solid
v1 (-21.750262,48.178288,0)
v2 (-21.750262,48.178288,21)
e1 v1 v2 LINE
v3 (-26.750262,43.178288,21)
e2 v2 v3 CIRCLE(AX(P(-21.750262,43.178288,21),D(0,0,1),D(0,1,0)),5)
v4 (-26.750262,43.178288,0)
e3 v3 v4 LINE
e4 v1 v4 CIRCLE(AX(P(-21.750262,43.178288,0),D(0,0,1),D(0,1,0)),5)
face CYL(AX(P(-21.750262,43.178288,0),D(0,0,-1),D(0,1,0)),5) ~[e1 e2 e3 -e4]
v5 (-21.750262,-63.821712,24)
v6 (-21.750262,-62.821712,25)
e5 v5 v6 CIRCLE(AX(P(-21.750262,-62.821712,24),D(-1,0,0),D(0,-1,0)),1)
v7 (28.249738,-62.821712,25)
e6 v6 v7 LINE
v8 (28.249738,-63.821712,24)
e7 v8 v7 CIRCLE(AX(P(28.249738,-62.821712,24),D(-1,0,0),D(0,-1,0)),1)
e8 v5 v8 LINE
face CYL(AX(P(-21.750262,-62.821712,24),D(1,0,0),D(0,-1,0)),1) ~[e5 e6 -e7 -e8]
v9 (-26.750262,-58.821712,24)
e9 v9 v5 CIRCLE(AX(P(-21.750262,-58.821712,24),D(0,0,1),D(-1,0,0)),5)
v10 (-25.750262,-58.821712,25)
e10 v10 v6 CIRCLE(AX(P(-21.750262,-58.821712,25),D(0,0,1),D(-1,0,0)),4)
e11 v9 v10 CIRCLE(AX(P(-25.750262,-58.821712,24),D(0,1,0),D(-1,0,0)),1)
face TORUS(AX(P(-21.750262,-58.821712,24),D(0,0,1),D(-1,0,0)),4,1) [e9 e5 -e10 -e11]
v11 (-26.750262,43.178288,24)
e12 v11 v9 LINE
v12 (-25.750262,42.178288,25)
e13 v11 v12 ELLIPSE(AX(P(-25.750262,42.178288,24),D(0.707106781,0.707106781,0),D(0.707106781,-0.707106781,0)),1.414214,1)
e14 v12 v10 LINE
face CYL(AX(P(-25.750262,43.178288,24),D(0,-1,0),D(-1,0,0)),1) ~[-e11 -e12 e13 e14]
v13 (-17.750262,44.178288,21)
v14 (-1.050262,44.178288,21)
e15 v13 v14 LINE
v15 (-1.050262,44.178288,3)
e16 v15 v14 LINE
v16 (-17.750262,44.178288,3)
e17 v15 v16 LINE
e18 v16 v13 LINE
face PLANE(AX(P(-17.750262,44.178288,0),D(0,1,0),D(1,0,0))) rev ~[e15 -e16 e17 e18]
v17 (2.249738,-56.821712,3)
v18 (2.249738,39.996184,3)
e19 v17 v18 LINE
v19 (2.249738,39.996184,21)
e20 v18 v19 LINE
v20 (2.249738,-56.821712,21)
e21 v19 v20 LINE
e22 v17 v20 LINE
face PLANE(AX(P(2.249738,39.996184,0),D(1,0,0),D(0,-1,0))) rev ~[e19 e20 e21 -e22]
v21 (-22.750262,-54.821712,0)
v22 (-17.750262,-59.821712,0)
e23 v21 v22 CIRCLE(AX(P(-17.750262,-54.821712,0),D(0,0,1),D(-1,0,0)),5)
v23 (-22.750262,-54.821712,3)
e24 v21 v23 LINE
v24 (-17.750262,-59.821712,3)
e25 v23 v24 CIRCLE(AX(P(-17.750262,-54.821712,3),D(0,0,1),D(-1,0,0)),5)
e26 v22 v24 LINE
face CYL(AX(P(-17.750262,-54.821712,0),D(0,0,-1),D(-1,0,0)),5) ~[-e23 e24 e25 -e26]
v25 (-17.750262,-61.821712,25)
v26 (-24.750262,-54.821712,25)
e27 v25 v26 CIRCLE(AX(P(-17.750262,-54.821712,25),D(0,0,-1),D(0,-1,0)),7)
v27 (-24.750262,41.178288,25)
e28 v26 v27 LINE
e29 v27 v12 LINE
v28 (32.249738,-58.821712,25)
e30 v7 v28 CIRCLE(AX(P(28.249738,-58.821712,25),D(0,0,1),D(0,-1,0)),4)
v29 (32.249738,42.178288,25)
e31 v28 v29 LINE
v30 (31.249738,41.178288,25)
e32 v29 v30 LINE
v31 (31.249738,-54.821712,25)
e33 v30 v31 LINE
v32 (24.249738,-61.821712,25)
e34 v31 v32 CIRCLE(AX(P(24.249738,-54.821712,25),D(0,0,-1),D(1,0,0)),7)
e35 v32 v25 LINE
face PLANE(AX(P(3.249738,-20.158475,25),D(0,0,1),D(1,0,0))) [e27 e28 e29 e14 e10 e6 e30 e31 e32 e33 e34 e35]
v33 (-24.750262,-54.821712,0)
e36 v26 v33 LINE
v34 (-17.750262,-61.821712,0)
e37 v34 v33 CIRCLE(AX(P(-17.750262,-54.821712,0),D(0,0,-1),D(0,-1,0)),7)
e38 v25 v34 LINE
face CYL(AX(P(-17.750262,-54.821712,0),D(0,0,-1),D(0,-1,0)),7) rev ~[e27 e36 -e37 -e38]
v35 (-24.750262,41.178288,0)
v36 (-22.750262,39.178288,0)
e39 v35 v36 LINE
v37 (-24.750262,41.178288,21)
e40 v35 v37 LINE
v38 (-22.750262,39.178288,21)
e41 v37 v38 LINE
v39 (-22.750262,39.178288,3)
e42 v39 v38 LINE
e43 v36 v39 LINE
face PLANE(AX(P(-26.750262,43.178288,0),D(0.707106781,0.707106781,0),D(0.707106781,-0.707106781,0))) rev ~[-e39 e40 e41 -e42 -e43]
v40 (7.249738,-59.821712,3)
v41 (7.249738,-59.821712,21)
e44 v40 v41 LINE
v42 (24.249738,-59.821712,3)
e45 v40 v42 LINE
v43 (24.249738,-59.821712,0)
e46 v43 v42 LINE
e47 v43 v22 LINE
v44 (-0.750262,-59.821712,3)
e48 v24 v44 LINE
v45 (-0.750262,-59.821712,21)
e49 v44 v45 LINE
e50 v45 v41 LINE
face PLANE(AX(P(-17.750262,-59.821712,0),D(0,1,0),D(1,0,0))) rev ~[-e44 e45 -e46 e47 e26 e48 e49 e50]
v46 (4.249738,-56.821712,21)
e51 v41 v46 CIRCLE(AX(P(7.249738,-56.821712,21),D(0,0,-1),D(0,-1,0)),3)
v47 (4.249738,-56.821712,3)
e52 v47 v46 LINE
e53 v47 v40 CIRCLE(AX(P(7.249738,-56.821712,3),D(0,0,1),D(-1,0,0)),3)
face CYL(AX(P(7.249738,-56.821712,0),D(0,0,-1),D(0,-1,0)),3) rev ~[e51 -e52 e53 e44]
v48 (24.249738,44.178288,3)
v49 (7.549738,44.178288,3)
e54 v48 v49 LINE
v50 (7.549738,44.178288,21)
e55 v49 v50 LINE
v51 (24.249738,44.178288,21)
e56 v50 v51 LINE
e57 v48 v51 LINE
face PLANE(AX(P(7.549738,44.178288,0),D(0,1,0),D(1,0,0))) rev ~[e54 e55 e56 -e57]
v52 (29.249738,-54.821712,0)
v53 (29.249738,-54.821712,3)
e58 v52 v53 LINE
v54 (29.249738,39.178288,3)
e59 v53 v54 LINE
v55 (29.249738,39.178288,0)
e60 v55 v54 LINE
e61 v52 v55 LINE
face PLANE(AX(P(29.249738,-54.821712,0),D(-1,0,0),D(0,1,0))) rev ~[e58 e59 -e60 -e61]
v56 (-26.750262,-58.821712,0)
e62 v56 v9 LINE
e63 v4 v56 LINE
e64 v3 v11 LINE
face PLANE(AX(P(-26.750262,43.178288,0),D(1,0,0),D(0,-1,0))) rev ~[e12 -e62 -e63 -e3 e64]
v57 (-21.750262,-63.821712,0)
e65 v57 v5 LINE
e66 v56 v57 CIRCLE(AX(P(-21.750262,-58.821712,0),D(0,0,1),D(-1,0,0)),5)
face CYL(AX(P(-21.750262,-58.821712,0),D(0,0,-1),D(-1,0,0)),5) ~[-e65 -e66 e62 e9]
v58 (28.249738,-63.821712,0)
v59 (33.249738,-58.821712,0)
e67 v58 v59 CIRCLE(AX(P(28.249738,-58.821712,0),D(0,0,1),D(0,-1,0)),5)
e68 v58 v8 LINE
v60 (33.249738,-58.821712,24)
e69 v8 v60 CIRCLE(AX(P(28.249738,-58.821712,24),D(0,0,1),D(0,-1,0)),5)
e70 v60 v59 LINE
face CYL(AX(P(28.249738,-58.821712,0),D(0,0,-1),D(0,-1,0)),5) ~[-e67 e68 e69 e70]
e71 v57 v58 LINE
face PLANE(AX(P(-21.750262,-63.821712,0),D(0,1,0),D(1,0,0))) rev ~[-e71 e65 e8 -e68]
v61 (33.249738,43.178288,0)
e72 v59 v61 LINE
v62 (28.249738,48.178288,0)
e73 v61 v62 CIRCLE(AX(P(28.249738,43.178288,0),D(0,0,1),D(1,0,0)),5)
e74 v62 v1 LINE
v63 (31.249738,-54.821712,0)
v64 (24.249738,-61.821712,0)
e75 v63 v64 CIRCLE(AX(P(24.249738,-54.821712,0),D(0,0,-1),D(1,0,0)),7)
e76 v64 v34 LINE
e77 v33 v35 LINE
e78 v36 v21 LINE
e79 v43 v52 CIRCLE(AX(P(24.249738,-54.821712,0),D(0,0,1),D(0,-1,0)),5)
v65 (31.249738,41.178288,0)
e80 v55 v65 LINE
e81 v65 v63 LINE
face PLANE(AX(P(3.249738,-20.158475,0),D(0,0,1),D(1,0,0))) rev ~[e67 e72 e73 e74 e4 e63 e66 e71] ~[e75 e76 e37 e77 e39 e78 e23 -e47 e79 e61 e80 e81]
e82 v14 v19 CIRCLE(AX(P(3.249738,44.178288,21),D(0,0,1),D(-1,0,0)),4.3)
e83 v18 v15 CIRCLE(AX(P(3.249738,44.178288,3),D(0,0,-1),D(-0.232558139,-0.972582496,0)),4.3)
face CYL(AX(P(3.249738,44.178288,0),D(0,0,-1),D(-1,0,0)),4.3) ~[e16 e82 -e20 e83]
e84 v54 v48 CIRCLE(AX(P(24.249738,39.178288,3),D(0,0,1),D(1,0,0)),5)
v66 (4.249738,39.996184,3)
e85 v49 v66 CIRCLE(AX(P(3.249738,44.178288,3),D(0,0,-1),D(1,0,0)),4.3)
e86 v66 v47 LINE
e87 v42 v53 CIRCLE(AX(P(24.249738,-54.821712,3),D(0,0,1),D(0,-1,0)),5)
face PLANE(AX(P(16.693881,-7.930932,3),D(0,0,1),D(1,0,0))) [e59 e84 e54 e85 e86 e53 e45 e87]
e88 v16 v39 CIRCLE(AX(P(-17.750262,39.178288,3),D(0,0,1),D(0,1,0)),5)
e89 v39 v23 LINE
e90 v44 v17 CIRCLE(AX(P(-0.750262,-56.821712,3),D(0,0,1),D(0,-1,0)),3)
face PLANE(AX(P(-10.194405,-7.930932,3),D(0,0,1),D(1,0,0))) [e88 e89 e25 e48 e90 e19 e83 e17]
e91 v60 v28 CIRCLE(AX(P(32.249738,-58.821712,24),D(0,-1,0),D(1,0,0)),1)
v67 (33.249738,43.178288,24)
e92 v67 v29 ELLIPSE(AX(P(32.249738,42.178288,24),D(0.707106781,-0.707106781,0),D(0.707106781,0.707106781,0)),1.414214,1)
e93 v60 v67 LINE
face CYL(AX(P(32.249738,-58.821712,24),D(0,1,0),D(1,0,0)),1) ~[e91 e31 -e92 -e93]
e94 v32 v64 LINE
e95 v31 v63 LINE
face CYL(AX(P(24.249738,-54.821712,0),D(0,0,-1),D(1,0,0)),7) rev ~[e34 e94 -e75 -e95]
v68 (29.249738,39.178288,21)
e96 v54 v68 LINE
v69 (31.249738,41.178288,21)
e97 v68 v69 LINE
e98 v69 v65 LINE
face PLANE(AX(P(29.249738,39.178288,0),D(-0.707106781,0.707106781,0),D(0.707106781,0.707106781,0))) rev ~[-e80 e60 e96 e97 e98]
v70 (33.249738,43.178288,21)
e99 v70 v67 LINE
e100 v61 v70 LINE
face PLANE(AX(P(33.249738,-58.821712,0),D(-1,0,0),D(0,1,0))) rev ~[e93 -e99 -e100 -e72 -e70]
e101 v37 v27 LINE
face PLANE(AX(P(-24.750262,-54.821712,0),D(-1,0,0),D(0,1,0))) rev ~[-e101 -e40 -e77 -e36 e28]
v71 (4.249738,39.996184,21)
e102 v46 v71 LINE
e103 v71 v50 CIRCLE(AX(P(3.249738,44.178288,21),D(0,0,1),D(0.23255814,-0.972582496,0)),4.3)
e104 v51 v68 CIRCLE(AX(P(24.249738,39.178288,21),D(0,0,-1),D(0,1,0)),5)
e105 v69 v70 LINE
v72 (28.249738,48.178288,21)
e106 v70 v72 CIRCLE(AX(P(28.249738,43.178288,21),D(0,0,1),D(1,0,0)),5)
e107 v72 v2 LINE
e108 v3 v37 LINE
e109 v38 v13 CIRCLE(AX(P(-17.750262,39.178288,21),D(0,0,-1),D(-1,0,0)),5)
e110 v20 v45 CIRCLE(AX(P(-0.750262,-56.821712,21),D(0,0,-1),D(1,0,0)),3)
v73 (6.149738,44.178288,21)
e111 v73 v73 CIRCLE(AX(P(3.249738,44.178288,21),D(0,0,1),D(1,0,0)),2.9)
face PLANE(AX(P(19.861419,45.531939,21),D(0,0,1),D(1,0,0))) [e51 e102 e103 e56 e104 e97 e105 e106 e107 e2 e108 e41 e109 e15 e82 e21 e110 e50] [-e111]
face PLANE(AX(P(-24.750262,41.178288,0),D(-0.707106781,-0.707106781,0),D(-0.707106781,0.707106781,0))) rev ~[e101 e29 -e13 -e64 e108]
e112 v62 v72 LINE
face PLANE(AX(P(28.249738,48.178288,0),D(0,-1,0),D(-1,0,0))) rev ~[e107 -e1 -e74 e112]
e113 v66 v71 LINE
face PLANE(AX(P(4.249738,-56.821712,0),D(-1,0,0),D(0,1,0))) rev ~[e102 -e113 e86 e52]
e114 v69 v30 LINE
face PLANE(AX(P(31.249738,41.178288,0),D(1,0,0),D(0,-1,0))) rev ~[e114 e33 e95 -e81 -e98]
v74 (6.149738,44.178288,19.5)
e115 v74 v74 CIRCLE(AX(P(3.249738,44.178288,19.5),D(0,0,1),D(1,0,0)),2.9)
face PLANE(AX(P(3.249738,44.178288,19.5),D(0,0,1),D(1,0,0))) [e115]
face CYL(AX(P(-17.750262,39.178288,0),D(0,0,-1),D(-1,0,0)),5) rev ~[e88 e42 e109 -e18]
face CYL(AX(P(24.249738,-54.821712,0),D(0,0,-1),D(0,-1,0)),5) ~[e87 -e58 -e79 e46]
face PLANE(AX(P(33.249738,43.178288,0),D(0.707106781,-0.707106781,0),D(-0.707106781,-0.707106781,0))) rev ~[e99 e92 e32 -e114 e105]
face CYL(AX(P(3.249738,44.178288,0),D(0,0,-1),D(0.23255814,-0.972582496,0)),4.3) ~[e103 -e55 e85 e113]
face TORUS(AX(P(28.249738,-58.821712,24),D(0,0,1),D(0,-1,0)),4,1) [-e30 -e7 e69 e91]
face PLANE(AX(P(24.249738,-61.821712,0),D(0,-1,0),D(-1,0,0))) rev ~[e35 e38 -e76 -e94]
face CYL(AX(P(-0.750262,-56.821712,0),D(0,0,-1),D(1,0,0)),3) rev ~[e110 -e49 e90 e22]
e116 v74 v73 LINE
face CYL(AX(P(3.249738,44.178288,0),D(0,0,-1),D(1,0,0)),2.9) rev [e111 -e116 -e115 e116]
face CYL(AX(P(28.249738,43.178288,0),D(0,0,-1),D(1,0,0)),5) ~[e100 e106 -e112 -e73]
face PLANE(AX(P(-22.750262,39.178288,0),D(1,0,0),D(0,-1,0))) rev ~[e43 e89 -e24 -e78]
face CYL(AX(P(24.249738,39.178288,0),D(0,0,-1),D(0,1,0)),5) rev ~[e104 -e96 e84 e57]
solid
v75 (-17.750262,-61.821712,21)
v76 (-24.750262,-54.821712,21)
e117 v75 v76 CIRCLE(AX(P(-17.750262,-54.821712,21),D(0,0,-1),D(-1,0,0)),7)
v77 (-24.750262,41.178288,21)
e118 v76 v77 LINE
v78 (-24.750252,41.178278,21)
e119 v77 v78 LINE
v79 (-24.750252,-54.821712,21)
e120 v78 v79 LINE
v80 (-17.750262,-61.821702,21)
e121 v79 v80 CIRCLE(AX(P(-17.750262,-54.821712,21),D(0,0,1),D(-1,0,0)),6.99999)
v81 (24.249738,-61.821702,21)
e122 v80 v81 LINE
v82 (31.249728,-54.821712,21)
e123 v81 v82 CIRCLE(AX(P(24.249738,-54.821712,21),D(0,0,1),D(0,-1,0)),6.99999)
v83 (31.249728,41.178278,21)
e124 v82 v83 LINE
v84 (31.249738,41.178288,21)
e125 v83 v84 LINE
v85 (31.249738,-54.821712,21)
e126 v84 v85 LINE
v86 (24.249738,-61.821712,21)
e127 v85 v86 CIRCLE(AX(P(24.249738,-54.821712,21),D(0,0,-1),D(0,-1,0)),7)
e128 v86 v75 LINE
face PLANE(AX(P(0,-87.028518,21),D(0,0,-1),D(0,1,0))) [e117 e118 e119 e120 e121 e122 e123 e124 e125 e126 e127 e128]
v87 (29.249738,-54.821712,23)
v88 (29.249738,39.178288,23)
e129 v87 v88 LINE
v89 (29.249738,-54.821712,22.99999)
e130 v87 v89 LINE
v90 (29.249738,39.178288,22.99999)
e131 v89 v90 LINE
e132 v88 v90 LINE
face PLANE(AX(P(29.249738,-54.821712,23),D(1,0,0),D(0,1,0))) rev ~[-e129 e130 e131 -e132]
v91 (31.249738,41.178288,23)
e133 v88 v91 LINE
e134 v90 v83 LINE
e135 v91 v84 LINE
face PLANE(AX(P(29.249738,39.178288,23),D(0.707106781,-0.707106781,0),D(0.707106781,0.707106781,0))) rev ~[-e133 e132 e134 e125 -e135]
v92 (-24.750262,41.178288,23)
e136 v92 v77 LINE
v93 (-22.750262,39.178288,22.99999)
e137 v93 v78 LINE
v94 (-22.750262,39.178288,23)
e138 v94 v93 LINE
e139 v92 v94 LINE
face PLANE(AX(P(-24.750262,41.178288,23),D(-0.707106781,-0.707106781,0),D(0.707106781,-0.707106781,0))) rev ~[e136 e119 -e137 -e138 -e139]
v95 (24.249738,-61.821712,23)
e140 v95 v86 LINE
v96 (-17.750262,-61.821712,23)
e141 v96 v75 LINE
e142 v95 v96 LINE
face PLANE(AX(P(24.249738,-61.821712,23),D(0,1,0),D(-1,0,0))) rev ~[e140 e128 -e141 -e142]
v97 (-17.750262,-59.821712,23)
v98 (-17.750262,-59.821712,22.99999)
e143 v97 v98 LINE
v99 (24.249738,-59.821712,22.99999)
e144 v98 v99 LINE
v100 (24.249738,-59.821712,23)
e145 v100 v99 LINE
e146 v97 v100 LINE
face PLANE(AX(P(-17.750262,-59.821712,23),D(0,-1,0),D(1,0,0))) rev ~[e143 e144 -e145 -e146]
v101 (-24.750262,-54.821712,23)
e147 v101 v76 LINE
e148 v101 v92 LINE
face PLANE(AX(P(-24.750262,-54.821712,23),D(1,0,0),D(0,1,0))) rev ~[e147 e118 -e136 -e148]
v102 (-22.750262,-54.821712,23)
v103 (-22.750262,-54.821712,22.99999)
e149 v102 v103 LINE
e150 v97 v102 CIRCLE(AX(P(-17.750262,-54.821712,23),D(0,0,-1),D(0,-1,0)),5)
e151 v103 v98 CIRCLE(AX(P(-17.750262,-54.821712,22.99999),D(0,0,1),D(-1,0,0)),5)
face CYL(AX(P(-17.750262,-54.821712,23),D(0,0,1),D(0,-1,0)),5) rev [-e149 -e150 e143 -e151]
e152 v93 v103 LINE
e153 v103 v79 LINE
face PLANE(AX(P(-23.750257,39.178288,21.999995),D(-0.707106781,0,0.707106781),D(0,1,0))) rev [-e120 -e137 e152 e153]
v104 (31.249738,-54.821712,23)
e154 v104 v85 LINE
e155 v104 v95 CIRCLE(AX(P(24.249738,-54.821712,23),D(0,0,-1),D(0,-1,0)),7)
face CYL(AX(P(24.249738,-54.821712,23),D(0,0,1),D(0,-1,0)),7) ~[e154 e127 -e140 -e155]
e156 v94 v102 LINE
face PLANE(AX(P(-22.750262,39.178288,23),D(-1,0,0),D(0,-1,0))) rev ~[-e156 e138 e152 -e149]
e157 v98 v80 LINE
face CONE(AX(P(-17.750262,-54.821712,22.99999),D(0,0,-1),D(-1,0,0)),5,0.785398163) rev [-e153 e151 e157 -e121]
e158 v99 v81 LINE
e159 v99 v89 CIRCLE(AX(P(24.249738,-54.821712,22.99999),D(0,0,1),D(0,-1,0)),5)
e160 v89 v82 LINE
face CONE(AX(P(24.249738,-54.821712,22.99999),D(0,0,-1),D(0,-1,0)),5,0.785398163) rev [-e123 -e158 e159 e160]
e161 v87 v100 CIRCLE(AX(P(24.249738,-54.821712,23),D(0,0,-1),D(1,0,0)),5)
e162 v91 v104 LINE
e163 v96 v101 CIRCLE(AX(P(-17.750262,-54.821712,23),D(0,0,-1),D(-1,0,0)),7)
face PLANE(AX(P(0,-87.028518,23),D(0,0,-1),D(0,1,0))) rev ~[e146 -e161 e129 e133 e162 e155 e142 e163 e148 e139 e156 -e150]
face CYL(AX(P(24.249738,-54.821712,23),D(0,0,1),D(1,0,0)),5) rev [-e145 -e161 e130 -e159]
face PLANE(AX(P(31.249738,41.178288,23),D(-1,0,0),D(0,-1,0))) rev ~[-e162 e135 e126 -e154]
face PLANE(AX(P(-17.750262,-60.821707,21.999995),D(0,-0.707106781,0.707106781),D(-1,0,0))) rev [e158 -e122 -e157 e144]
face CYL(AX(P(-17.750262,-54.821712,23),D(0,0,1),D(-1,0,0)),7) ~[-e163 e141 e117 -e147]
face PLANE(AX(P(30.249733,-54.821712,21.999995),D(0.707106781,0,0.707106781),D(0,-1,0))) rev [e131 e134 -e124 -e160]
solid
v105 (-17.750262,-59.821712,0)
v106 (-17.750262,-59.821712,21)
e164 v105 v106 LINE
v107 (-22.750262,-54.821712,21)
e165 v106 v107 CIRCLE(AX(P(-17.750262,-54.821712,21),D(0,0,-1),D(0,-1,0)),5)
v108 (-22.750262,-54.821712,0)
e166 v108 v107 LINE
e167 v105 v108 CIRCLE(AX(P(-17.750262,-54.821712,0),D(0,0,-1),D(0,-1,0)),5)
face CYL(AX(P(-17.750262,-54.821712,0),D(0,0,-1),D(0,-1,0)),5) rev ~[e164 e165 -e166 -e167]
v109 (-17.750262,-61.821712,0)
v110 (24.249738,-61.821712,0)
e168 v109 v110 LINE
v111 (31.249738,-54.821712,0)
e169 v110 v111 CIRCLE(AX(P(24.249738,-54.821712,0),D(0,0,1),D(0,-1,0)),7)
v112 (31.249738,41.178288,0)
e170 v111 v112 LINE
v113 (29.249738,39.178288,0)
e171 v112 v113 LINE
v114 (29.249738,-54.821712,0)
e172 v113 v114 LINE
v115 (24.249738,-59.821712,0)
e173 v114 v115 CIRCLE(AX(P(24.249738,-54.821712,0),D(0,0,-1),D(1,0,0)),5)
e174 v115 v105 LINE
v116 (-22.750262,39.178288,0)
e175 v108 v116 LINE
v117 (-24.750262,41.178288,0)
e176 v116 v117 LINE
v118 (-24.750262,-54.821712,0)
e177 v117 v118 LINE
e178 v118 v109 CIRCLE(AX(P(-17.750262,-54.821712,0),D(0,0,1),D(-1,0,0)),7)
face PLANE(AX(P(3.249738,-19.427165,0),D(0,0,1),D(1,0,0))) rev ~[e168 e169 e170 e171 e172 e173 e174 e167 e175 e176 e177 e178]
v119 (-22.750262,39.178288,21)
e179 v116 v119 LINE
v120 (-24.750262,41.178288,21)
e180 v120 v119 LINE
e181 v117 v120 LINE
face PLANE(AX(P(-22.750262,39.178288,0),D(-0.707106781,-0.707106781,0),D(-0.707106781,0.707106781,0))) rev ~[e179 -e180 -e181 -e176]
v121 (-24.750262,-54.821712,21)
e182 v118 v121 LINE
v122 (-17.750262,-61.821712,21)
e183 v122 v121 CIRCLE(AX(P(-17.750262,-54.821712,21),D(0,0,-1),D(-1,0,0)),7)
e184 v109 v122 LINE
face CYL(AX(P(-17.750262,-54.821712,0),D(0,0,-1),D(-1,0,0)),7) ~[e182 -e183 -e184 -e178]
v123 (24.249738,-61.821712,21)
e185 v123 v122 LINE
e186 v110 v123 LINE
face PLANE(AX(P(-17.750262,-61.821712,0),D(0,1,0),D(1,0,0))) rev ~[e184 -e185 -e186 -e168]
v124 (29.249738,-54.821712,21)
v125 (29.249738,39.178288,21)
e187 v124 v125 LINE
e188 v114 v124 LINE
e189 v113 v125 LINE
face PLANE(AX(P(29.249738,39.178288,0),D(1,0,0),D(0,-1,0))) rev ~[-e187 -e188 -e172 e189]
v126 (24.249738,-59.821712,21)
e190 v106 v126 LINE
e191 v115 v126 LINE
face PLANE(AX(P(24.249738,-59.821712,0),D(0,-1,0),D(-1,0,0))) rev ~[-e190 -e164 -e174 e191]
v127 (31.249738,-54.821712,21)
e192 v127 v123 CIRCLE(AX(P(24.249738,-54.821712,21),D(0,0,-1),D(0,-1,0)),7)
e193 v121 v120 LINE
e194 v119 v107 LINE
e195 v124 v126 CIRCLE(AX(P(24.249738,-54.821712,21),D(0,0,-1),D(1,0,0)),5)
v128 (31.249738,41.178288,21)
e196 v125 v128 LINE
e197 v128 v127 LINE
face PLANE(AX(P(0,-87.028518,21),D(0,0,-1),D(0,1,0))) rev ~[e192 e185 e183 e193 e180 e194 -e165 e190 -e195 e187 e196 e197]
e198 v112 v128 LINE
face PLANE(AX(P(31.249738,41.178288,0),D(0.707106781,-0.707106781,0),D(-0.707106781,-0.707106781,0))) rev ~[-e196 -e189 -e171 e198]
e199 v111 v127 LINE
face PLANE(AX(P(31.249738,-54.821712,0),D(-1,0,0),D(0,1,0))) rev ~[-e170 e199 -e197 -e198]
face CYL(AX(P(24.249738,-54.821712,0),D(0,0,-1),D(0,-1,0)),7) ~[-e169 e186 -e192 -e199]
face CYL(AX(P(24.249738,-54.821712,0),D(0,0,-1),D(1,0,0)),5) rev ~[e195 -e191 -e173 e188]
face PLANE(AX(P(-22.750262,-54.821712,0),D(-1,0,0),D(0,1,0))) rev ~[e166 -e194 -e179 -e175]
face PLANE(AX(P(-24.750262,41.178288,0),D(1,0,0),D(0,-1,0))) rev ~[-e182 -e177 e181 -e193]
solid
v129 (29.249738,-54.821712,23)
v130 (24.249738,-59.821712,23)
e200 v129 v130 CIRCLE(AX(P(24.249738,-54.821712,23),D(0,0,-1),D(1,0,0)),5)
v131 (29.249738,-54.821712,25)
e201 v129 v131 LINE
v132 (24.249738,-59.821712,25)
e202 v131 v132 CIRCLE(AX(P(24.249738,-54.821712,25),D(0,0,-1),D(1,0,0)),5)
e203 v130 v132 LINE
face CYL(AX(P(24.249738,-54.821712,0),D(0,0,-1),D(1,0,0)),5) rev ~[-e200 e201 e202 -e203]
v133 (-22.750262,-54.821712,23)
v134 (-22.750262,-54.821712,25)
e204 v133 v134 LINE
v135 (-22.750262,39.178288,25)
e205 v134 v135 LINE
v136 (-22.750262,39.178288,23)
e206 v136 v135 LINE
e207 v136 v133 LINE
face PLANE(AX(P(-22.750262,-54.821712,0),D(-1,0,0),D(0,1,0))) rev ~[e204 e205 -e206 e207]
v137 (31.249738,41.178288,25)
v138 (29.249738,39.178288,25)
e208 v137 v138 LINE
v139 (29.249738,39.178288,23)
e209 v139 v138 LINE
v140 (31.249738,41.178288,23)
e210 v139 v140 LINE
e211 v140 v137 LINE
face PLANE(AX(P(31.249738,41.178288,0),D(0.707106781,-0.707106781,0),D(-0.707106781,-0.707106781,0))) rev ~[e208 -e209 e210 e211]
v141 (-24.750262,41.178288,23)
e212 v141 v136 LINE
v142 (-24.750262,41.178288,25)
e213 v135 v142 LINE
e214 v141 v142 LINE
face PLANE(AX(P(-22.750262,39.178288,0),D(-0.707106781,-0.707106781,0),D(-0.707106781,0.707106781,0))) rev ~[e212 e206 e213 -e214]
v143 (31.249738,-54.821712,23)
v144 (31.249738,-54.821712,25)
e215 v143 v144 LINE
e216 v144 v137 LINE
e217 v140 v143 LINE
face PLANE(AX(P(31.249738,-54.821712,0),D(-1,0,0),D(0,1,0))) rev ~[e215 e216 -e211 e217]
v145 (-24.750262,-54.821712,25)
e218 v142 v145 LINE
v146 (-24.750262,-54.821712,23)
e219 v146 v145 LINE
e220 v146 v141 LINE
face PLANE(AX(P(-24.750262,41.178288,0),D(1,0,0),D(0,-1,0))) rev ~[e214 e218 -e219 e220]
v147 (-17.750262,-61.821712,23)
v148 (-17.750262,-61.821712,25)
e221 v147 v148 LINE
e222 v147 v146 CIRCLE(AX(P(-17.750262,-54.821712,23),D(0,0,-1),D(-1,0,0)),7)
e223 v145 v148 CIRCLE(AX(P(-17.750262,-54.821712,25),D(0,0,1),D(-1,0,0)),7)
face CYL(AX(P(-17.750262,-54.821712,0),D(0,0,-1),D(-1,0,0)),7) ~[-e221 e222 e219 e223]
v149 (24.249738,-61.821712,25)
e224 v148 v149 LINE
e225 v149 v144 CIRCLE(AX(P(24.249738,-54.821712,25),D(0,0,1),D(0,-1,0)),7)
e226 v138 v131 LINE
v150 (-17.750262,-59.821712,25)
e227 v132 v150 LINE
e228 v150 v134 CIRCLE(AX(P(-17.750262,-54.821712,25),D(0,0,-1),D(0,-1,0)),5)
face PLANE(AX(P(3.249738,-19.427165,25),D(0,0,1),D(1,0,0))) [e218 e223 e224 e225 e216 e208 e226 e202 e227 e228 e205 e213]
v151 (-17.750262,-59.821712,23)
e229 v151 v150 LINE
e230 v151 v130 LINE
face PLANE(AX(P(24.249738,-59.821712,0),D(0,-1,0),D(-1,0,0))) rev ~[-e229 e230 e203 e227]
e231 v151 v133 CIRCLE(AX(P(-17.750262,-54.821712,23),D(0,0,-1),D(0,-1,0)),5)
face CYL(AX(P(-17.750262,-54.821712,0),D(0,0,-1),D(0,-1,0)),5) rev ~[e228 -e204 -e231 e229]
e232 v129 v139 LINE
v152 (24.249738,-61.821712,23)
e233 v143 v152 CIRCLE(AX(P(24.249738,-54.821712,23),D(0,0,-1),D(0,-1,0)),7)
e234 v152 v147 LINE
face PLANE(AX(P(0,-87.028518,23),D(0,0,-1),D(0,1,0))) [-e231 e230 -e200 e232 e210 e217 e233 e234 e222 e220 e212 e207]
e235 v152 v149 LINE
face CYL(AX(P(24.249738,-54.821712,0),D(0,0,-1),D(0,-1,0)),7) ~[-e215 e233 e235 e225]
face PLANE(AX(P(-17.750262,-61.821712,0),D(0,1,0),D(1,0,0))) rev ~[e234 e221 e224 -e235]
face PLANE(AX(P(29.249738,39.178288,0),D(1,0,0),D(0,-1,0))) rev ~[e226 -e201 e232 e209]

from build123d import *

# Parameters (mm, degrees)
F0_R     = 2.9
F1_DEPTH = 21
F2_DEPTH = 3
F3_DEPTH = 19.5
F4_DEPTH = 25
F5_DEPTH = 25
F6_W     = 150
F6_H     = 2
F7_DEPTH = 35
F8_DEPTH = 2
F9_SIZE  = 1.99999
F10_R    = 1


# Not quite as in the source:
# - a fillet or chamfer is up to 0.001 mm smaller than in the source, because OpenCascade refuses the exact size
# - a feature names something its author has since deleted; it is built from what else it names


with BuildPart() as f1:
    # F0 (on Top) → F1 (new body)
    with BuildSketch(Plane.XY):
        with BuildLine():
            Line((28.249738031, 48.17828843), (4.8277114148, 48.17828843))
            ThreePointArc((4.8277114148, 48.17828843), (6.8046842718, 46.5974530016), (7.549738031, 44.17828843))
            Line((7.549738031, 44.17828843), (24.249738031, 44.17828843))
            ThreePointArc((24.249738031, 44.17828843), (27.7852719369, 42.7138223359), (29.249738031, 39.17828843))
            Line((29.249738031, 39.17828843), (31.249738031, 41.17828843))
            Line((31.249738031, 41.17828843), (33.249738031, 43.17828843))
            ThreePointArc((33.249738031, 43.17828843), (31.7852719369, 46.7138223359), (28.249738031, 48.17828843))
        make_face()
        with BuildLine():
            Line((1.6717646472, 48.17828843), (-21.750261969, 48.17828843))
            ThreePointArc((-21.750261969, 48.17828843), (-25.285795875, 46.7138223359), (-26.750261969, 43.17828843))
            Line((-26.750261969, 43.17828843), (-24.750261969, 41.17828843))
            Line((-24.750261969, 41.17828843), (-22.750261969, 39.17828843))
            ThreePointArc((-22.750261969, 39.17828843), (-21.285795875, 42.7138223359), (-17.750261969, 44.17828843))
            Line((-17.750261969, 44.17828843), (-1.050261969, 44.17828843))
            ThreePointArc((-1.050261969, 44.17828843), (-0.3052082099, 46.5974530016), (1.6717646472, 48.17828843))
        make_face()
        with BuildLine():
            ThreePointArc((4.249738031, 39.9961836967), (3.249738031, 39.87828843), (2.249738031, 39.9961836967))
            Line((2.249738031, 39.9961836967), (2.249738031, -56.82171157))
            ThreePointArc((2.249738031, -56.82171157), (1.3710583745, -58.9430319136), (-0.750261969, -59.82171157))
            Line((-0.750261969, -59.82171157), (7.249738031, -59.82171157))
            ThreePointArc((7.249738031, -59.82171157), (5.1284176874, -58.9430319136), (4.249738031, -56.82171157))
            Line((4.249738031, -56.82171157), (4.249738031, 39.9961836967))
        make_face()
        with BuildLine():
            Line((4.8277114148, 48.17828843), (1.6717646472, 48.17828843))
            ThreePointArc((1.6717646472, 48.17828843), (-0.3052082099, 46.5974530016), (-1.050261969, 44.17828843))
            ThreePointArc((-1.050261969, 44.17828843), (-0.125910055, 41.5146443096), (2.249738031, 39.9961836967))
            ThreePointArc((2.249738031, 39.9961836967), (3.249738031, 39.87828843), (4.249738031, 39.9961836967))
            ThreePointArc((4.249738031, 39.9961836967), (6.6253861169, 41.5146443096), (7.549738031, 44.17828843))
            ThreePointArc((7.549738031, 44.17828843), (6.8046842718, 46.5974530016), (4.8277114148, 48.17828843))
        make_face()
        with Locations((3.249738031, 44.17828843)):
            Circle(F0_R, mode=Mode.SUBTRACT)
    extrude(amount=F1_DEPTH)

    # F0 (on Top) → F2 (join)
    with BuildSketch(Plane.XY):
        with BuildLine():
            ThreePointArc((2.249738031, 39.9961836967), (-0.125910055, 41.5146443096), (-1.050261969, 44.17828843))
            Line((-1.050261969, 44.17828843), (-17.750261969, 44.17828843))
            ThreePointArc((-17.750261969, 44.17828843), (-21.285795875, 42.7138223359), (-22.750261969, 39.17828843))
            Line((-22.750261969, 39.17828843), (-22.750261969, -54.82171157))
            ThreePointArc((-22.750261969, -54.82171157), (-21.285795875, -58.357245476), (-17.750261969, -59.82171157))
            Line((-17.750261969, -59.82171157), (-0.750261969, -59.82171157))
            ThreePointArc((-0.750261969, -59.82171157), (1.3710583745, -58.9430319136), (2.249738031, -56.82171157))
            Line((2.249738031, -56.82171157), (2.249738031, 39.9961836967))
        make_face()
        with BuildLine():
            Line((24.249738031, 44.17828843), (7.549738031, 44.17828843))
            ThreePointArc((7.549738031, 44.17828843), (6.6253861169, 41.5146443096), (4.249738031, 39.9961836967))
            Line((4.249738031, 39.9961836967), (4.249738031, -56.82171157))
            ThreePointArc((4.249738031, -56.82171157), (5.1284176874, -58.9430319136), (7.249738031, -59.82171157))
            Line((7.249738031, -59.82171157), (24.249738031, -59.82171157))
            ThreePointArc((24.249738031, -59.82171157), (27.7852719369, -58.357245476), (29.249738031, -54.82171157))
            Line((29.249738031, -54.82171157), (29.249738031, 39.17828843))
            ThreePointArc((29.249738031, 39.17828843), (27.7852719369, 42.7138223359), (24.249738031, 44.17828843))
        make_face()
    extrude(amount=F2_DEPTH)

    # F0 (on Top) → F3 (join)
    with BuildSketch(Plane.XY):
        with BuildLine():
            Line((-24.750261969, 41.17828843), (-26.750261969, 43.17828843))
            Line((-26.750261969, 43.17828843), (-26.750261969, -58.82171157))
            ThreePointArc((-26.750261969, -58.82171157), (-25.285795875, -62.357245476), (-21.750261969, -63.82171157))
            Line((-21.750261969, -63.82171157), (28.249738031, -63.82171157))
            ThreePointArc((28.249738031, -63.82171157), (31.7852719369, -62.357245476), (33.249738031, -58.82171157))
            Line((33.249738031, -58.82171157), (33.249738031, 43.17828843))
            Line((33.249738031, 43.17828843), (31.249738031, 41.17828843))
            Line((31.249738031, 41.17828843), (31.249738031, -54.82171157))
            ThreePointArc((31.249738031, -54.82171157), (29.1994854993, -59.7714590383), (24.249738031, -61.82171157))
            Line((24.249738031, -61.82171157), (-17.750261969, -61.82171157))
            ThreePointArc((-17.750261969, -61.82171157), (-22.7000094373, -59.7714590383), (-24.750261969, -54.82171157))
            Line((-24.750261969, -54.82171157), (-24.750261969, 41.17828843))
        make_face()
        with Locations((3.249738031, 44.17828843)):
            Circle(F0_R)
    extrude(amount=F3_DEPTH)

    # F0 (on Top) → F4 (join)
    with BuildSketch(Plane.XY):
        with BuildLine():
            Line((-24.750261969, 41.17828843), (-26.750261969, 43.17828843))
            Line((-26.750261969, 43.17828843), (-26.750261969, -58.82171157))
            ThreePointArc((-26.750261969, -58.82171157), (-25.285795875, -62.357245476), (-21.750261969, -63.82171157))
            Line((-21.750261969, -63.82171157), (28.249738031, -63.82171157))
            ThreePointArc((28.249738031, -63.82171157), (31.7852719369, -62.357245476), (33.249738031, -58.82171157))
            Line((33.249738031, -58.82171157), (33.249738031, 43.17828843))
            Line((33.249738031, 43.17828843), (31.249738031, 41.17828843))
            Line((31.249738031, 41.17828843), (31.249738031, -54.82171157))
            ThreePointArc((31.249738031, -54.82171157), (29.1994854993, -59.7714590383), (24.249738031, -61.82171157))
            Line((24.249738031, -61.82171157), (-17.750261969, -61.82171157))
            ThreePointArc((-17.750261969, -61.82171157), (-22.7000094373, -59.7714590383), (-24.750261969, -54.82171157))
            Line((-24.750261969, -54.82171157), (-24.750261969, 41.17828843))
        make_face()
    extrude(amount=F4_DEPTH)

    # F10
    f10_edges = [f1.edges().sort_by_distance(p)[0] for p in [
        (33.249738, -7.821712, 25),
        (31.785272, -62.357245, 25),
        (-26.750262, -7.821712, 25),
        (-25.285796, -62.357245, 25),
        (3.249738, -63.821712, 25),
    ]]
    fillet(f10_edges, radius=F10_R)


with BuildPart() as f5:
    # F0 (on Top) → F5 (new body)
    with BuildSketch(Plane.XY):
        with BuildLine():
            Line((-22.750261969, 39.17828843), (-24.750261969, 41.17828843))
            Line((-24.750261969, 41.17828843), (-24.750261969, -54.82171157))
            ThreePointArc((-24.750261969, -54.82171157), (-22.7000094373, -59.7714590383), (-17.750261969, -61.82171157))
            Line((-17.750261969, -61.82171157), (24.249738031, -61.82171157))
            ThreePointArc((24.249738031, -61.82171157), (29.1994854993, -59.7714590383), (31.249738031, -54.82171157))
            Line((31.249738031, -54.82171157), (31.249738031, 41.17828843))
            Line((31.249738031, 41.17828843), (29.249738031, 39.17828843))
            Line((29.249738031, 39.17828843), (29.249738031, -54.82171157))
            ThreePointArc((29.249738031, -54.82171157), (27.7852719369, -58.357245476), (24.249738031, -59.82171157))
            Line((24.249738031, -59.82171157), (7.249738031, -59.82171157))
            Line((7.249738031, -59.82171157), (-0.750261969, -59.82171157))
            Line((-0.750261969, -59.82171157), (-17.750261969, -59.82171157))
            ThreePointArc((-17.750261969, -59.82171157), (-21.285795875, -58.357245476), (-22.750261969, -54.82171157))
            Line((-22.750261969, -54.82171157), (-22.750261969, 39.17828843))
        make_face()
    extrude(amount=F5_DEPTH)

    # F6 (on Right) → F7 (cut, symmetric)
    with BuildSketch(Plane.YZ):
        with Locations((-12.0285183191, 22)):
            Rectangle(F6_W, F6_H)
    extrude(amount=F7_DEPTH, both=True, mode=Mode.SUBTRACT)


with BuildPart() as f8:
    # F8 (new): a face of the model
    f8_faces = [f5.part.faces().sort_by_distance(p)[0] for p in [
        (30.4221287508, -7.82171157, 23),
    ]]
    extrude(f8_faces, amount=F8_DEPTH)

    # F9 (size 2 in the source; OpenCascade refuses exactly that, so slightly less here)
    f9_edges = [f8.edges().sort_by_distance(p)[0] for p in [
        (-22.750262, -7.821712, 21),
    ]]
    chamfer(f9_edges, length=F9_SIZE)


solid = Compound([f1.part, f5.part, f8.part])
